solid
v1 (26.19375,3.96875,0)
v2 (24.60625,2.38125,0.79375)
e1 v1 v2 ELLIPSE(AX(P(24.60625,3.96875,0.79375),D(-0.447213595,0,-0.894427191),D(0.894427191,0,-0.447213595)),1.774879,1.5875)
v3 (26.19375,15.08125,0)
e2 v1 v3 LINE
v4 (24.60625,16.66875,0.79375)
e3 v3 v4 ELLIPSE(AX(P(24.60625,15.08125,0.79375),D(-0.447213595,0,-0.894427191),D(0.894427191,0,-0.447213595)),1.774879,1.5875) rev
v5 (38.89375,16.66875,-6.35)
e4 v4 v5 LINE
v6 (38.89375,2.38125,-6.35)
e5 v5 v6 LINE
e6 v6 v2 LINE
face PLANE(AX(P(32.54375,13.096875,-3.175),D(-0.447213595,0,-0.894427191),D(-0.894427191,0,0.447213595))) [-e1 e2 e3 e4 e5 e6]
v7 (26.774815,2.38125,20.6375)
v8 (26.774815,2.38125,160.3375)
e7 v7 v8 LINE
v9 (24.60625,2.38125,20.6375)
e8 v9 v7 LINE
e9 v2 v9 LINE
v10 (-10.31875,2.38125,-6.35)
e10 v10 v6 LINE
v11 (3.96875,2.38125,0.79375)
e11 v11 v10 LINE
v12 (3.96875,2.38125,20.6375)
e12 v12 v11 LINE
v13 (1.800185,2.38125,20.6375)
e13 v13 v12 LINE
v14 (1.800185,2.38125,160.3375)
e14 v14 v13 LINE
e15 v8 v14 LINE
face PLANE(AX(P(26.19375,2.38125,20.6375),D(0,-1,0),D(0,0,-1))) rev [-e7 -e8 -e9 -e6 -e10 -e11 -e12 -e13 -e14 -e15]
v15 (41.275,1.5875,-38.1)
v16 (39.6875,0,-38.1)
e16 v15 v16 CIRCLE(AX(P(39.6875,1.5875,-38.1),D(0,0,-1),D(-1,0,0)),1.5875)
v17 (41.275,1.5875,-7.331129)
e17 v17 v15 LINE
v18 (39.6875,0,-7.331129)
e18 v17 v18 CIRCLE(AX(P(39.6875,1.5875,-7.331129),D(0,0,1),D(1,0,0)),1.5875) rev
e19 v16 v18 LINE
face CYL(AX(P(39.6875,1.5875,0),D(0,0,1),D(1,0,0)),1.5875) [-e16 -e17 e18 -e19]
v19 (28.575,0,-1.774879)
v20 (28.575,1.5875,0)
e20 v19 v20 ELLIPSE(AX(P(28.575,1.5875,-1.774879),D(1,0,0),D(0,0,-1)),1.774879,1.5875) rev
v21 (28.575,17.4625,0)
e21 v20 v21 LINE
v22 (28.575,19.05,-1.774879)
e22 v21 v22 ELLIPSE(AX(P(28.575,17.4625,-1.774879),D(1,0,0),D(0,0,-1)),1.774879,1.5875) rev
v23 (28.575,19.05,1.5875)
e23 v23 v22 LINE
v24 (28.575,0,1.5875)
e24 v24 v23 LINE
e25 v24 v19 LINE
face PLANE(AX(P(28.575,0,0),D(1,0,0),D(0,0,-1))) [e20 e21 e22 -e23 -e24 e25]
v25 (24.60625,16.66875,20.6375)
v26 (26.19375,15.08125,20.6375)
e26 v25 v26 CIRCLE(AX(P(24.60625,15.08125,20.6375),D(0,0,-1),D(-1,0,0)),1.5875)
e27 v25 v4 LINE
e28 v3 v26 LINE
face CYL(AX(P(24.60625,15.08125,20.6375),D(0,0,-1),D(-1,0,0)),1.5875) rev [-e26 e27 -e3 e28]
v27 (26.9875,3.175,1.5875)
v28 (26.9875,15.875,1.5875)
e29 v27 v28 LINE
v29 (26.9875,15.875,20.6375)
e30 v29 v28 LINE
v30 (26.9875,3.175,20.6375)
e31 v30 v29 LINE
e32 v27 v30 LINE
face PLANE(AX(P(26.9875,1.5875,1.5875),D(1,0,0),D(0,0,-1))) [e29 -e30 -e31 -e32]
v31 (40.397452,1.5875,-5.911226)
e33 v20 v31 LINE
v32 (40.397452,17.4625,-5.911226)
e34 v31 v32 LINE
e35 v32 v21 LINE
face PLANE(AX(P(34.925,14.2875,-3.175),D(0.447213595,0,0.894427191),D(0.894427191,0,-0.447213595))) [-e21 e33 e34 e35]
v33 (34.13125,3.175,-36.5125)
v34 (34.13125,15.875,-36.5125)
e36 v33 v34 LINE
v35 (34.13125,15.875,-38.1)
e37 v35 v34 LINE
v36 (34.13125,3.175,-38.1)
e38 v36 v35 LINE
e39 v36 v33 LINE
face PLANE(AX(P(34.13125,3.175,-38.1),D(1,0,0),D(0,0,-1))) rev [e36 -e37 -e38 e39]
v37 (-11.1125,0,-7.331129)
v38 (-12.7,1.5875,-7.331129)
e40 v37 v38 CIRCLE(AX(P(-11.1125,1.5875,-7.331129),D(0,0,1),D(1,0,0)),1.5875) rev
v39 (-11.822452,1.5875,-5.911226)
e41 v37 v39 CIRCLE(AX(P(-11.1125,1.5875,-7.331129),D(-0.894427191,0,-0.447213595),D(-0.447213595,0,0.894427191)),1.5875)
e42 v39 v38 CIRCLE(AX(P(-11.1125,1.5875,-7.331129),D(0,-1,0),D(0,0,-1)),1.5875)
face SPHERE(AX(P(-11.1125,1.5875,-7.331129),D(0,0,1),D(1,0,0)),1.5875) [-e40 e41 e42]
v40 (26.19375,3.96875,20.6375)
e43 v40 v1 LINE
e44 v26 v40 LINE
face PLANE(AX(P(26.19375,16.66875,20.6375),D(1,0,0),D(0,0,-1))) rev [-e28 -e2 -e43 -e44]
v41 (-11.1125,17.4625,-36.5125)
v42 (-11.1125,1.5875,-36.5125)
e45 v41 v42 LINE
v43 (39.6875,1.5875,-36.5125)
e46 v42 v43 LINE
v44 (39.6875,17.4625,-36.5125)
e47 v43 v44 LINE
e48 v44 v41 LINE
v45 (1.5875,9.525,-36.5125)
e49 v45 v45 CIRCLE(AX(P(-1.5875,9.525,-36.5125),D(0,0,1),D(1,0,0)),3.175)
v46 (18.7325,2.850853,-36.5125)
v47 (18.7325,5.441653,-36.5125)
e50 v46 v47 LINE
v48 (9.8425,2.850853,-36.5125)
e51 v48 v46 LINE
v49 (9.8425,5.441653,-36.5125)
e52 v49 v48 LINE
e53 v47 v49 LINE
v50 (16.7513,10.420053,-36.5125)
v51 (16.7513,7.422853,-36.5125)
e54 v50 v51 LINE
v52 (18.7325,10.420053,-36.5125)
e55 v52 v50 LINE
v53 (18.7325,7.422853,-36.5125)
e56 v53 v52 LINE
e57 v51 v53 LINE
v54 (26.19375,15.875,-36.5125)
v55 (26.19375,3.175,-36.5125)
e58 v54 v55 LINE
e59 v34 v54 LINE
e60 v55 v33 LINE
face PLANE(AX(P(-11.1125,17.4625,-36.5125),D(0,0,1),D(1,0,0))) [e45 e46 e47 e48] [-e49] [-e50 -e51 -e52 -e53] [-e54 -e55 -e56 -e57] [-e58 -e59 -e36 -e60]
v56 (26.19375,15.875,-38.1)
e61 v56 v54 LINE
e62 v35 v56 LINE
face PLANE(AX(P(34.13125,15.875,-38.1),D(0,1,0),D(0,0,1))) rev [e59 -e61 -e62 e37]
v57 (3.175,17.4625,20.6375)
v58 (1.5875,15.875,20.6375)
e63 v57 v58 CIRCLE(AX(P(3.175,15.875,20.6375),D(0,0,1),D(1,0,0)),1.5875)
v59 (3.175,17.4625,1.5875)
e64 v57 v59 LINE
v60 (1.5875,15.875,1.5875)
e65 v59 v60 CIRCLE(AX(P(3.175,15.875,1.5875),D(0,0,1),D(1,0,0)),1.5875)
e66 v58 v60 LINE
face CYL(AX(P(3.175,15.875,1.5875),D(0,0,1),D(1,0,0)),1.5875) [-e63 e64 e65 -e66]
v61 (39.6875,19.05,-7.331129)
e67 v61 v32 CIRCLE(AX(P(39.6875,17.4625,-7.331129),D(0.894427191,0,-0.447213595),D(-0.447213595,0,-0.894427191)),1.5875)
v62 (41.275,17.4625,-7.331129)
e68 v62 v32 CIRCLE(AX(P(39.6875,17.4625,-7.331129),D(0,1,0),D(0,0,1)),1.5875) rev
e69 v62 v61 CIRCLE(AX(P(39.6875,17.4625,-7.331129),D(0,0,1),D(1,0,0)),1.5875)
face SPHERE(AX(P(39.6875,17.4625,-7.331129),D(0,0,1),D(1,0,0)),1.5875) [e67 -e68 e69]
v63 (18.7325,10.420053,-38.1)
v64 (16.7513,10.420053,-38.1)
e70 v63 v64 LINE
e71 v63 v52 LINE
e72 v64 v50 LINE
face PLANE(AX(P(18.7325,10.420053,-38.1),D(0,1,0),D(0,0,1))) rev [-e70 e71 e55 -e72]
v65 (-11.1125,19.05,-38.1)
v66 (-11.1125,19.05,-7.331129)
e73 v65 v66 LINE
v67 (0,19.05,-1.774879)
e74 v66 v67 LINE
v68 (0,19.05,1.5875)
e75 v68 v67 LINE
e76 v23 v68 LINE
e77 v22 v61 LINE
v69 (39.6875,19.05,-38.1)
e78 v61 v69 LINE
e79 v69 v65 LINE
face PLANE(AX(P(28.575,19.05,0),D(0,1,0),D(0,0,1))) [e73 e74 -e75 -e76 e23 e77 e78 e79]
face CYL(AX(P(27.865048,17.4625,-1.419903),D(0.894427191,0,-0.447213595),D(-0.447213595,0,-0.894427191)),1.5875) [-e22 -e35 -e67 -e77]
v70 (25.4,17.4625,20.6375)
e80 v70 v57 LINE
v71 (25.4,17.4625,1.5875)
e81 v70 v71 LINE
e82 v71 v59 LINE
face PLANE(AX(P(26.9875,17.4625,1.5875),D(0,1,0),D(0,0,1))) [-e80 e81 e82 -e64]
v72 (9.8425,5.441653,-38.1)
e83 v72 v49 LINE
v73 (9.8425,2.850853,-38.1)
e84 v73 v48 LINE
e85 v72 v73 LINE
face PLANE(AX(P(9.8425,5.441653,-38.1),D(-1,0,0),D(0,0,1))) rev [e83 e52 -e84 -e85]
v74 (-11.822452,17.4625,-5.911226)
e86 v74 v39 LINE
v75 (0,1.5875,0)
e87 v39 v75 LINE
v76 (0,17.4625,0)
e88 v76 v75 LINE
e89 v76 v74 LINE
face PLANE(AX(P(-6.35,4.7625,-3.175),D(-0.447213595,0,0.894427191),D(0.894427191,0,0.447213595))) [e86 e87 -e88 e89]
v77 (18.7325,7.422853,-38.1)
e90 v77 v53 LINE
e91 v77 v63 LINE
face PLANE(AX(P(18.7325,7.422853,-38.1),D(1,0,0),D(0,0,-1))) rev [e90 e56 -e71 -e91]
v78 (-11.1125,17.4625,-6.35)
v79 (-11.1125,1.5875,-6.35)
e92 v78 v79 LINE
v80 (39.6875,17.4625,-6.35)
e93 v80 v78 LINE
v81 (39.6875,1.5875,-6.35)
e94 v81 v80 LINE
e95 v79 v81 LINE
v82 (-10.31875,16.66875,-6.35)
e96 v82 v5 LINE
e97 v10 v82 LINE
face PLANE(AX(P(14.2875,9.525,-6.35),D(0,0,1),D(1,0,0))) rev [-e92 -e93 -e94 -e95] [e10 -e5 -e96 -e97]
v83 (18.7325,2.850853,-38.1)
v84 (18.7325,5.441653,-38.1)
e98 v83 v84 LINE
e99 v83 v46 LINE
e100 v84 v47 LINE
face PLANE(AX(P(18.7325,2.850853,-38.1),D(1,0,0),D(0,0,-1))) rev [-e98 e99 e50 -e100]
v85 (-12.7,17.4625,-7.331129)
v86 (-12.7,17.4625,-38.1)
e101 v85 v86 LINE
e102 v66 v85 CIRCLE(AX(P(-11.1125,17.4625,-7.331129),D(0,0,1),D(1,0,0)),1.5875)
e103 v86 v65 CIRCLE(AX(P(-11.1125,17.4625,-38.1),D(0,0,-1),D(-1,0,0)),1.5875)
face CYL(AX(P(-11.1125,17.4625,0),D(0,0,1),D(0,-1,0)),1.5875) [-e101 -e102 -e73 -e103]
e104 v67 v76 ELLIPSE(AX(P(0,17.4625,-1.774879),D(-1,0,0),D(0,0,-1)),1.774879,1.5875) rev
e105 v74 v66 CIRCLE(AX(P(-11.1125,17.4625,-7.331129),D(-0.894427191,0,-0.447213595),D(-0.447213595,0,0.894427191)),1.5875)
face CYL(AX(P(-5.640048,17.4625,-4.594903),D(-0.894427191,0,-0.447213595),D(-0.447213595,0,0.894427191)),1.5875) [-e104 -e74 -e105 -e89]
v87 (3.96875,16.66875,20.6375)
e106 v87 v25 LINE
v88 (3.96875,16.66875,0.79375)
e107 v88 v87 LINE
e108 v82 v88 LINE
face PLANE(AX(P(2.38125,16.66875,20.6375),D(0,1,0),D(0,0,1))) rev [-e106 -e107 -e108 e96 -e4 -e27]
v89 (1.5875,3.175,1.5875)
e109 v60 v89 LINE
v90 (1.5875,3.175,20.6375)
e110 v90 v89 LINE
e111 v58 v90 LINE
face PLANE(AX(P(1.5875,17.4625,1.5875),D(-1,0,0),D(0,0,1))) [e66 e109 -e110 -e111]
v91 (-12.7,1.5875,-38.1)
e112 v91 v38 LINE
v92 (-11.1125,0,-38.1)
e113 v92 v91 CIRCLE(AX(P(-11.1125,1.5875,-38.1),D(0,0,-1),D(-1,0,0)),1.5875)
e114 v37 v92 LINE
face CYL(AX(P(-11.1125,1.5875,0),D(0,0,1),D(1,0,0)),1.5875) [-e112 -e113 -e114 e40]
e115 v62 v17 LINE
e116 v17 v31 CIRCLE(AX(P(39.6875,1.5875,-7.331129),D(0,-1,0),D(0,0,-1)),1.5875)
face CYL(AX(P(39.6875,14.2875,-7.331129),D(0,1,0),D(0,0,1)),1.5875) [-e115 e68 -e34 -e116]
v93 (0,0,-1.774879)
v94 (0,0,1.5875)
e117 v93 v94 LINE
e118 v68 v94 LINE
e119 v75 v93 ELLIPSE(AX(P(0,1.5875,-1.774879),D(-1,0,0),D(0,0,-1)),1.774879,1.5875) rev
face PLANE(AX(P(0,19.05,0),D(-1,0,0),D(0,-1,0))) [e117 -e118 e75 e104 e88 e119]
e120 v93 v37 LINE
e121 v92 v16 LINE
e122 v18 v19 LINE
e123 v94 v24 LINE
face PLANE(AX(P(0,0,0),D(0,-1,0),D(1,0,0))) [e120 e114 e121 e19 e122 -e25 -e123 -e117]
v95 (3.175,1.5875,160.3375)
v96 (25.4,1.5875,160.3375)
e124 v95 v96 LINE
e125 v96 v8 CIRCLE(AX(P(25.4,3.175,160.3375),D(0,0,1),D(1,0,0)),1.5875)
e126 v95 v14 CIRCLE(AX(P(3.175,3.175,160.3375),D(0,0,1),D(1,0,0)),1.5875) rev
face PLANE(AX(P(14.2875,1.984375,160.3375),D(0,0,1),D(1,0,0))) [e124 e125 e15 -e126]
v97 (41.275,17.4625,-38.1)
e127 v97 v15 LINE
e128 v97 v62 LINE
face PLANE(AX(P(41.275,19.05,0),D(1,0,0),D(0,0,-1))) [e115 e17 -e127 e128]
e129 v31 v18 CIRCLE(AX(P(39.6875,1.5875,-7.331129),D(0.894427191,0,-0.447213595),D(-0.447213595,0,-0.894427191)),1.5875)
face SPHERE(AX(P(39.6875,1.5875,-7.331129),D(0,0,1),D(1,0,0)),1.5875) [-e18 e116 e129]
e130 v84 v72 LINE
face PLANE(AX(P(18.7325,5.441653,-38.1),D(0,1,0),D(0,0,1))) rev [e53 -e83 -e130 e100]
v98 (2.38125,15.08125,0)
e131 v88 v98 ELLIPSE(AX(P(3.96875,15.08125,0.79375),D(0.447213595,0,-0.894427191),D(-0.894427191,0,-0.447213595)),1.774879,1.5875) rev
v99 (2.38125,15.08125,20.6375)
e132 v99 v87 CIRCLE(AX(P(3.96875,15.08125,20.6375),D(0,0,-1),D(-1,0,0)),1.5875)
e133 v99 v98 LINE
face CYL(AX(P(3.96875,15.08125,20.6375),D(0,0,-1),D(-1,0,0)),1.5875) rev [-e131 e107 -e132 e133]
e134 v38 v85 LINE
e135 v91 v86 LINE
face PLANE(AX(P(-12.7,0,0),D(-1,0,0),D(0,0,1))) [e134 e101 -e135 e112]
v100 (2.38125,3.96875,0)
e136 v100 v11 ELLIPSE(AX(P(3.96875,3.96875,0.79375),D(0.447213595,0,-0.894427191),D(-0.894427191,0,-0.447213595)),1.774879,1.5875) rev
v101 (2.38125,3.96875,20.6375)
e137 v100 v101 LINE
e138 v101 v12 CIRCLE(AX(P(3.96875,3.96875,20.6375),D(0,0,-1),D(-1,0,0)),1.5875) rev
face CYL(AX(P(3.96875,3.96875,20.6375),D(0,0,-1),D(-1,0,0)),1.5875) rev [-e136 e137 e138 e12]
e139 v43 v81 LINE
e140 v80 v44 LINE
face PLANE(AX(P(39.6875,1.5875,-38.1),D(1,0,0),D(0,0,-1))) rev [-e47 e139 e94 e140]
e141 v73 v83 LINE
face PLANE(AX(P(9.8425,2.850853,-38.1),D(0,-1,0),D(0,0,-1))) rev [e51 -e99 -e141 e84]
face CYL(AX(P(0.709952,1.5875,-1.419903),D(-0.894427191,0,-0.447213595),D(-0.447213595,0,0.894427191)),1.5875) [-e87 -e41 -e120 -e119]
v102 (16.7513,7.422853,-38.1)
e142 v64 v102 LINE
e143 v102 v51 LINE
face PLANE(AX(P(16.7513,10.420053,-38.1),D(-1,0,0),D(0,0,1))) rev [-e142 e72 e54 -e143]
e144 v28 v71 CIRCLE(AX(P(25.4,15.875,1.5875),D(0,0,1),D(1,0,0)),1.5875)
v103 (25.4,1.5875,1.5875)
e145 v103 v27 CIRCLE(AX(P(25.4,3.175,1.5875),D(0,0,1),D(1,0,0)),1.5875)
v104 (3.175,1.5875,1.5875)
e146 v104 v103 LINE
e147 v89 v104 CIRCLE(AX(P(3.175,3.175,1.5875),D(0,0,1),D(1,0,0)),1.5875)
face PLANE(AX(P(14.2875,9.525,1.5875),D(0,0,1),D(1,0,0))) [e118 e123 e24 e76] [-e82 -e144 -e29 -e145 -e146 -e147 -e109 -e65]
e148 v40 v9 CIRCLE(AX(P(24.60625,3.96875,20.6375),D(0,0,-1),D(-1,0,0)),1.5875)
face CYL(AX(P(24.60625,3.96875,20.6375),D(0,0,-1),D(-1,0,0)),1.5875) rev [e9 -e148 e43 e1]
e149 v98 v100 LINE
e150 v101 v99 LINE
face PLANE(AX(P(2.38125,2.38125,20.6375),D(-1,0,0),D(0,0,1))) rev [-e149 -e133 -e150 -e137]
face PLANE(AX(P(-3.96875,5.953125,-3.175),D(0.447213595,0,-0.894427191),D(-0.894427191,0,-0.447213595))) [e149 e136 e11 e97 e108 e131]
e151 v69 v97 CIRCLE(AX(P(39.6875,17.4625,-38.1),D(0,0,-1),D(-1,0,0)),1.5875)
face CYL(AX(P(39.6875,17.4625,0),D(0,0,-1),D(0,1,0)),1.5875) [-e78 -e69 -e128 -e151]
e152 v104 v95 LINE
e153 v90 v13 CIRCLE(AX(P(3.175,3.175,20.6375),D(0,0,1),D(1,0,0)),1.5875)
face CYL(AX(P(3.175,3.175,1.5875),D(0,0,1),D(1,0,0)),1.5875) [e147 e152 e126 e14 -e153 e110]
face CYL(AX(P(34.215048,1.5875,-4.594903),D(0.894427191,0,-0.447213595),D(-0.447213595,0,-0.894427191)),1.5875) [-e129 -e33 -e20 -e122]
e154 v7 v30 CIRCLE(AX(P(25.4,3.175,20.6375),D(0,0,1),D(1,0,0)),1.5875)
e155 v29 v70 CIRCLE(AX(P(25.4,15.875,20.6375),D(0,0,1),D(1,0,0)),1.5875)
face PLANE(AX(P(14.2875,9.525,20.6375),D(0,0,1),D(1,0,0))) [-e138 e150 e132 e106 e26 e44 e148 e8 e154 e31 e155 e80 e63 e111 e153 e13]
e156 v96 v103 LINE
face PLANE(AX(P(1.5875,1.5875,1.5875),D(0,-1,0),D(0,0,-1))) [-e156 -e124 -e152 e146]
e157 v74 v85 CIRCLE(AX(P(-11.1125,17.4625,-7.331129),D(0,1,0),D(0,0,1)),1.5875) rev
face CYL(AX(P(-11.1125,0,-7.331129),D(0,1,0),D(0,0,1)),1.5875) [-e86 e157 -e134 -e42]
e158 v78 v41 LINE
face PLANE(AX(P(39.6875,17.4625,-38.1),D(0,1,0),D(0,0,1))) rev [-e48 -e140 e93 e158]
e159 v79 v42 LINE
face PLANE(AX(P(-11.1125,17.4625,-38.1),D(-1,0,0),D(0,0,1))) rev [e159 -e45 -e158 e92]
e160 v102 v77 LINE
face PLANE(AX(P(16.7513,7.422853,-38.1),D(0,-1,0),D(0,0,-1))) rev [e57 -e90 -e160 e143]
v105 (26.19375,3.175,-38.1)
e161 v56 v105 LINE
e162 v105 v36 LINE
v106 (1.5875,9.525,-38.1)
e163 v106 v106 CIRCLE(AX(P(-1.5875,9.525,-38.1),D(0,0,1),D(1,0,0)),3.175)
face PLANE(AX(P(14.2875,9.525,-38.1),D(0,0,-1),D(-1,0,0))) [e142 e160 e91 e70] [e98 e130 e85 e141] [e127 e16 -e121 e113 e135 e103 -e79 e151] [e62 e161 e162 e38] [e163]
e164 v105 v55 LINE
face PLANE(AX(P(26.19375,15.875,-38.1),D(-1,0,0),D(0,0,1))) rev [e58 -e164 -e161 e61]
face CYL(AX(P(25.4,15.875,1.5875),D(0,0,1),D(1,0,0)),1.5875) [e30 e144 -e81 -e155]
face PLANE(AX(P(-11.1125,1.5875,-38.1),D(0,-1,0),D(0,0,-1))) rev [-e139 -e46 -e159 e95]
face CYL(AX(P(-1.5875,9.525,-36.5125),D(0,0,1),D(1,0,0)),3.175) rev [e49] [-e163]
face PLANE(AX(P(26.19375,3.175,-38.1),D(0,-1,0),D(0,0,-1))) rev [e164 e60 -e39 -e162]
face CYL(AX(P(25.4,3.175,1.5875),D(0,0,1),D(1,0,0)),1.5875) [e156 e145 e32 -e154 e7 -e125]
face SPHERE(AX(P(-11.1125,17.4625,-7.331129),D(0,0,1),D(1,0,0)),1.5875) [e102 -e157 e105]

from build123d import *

# Parameters (mm, degrees)
CUT_EXTRUDE1_START         = -1.5875
CUT_EXTRUDE1_OUTLINE_W     = 53.975
CUT_EXTRUDE1_OUTLINE_H     = 19.05
CUT_EXTRUDE1_OUTLINE_W_2   = 50.8
CUT_EXTRUDE1_OUTLINE_H_2   = 15.875
CUT_EXTRUDE1_DEPTH         = 38.1
CUT_EXTRUDE1_START_2       = 30.1625
CUT_EXTRUDE1_2_DEPTH       = 166.6875
CUT_EXTRUDE1_3_DEPTH       = 6.35
CUT_EXTRUDE1_4_OUTLINE_W   = 50.8
CUT_EXTRUDE1_4_OUTLINE_H   = 15.875
CUT_EXTRUDE1_4_OUTLINE_W_2 = 7.9375
CUT_EXTRUDE1_4_OUTLINE_H_2 = 12.7
CUT_EXTRUDE1_4_DEPTH       = 1.5875
CUT_EXTRUDE1_5_DEPTH       = 26.9875
CUT_EXTRUDE1_6_OUTLINE_W   = 28.575
CUT_EXTRUDE1_6_OUTLINE_H   = 19.05
CUT_EXTRUDE1_6_DEPTH       = 7.9375
CUT_EXTRUDE1_START_3       = 2.38125
CUT_EXTRUDE1_7_DEPTH       = 14.2875
CUT_EXTRUDE1_8_DEPTH       = 19.05
SKETCH2_W                  = 8.89
SKETCH2_H                  = 2.5908
CUT_EXTRUDE2_DEPTH         = 203.030816028
SKETCH3_W                  = 1.9812
SKETCH3_H                  = 2.9972
CUT_EXTRUDE3_DEPTH         = 203.030816028
FILLET1_R                  = 1.5875
HOLE1_D                    = 6.35
HOLE1_DEPTH                = 1.5875


with BuildPart() as part:
    # Cut-Extrude1: read off the stored shape, not the designer's step
    # Cut-Extrude1 outline → Cut-Extrude1 (new body)
    with BuildSketch(Plane.XY.offset(-36.5125).offset(CUT_EXTRUDE1_START)):
        with Locations((14.2875, 9.525)):
            Rectangle(CUT_EXTRUDE1_OUTLINE_W, CUT_EXTRUDE1_OUTLINE_H)
        with Locations((14.2875, 9.525)):
            Rectangle(CUT_EXTRUDE1_OUTLINE_W_2, CUT_EXTRUDE1_OUTLINE_H_2, mode=Mode.SUBTRACT)
    extrude(amount=CUT_EXTRUDE1_DEPTH)

    # Cut-Extrude1 2 outline → Cut-Extrude1 2 (add)
    with BuildSketch(Plane.XY.offset(-36.5125).offset(CUT_EXTRUDE1_START_2)):
        with BuildLine():
            Line((3.175, 1.5875), (25.4, 1.5875))
            ThreePointArc((25.4, 1.5875), (26.19375, 1.800184672), (26.774815328, 2.38125))
            Line((26.774815328, 2.38125), (1.800184672, 2.38125))
            ThreePointArc((1.800184672, 2.38125), (2.38125, 1.800184672), (3.175, 1.5875))
        make_face()
    extrude(amount=CUT_EXTRUDE1_2_DEPTH)

    # Cut-Extrude1 3 outline → Cut-Extrude1 3 (add)
    with BuildSketch(Plane.XY.offset(-36.5125).offset(CUT_EXTRUDE1_START_2)):
        with BuildLine():
            Line((25.4, 1.5875), (39.6875, 1.5875))
            Line((39.6875, 1.5875), (39.6875, 17.4625))
            Line((39.6875, 17.4625), (-11.1125, 17.4625))
            Line((-11.1125, 17.4625), (-11.1125, 1.5875))
            Line((-11.1125, 1.5875), (3.175, 1.5875))
            ThreePointArc((3.175, 1.5875), (2.38125, 1.800184672), (1.800184672, 2.38125))
            Line((1.800184672, 2.38125), (3.96875, 2.38125))
            ThreePointArc((3.96875, 2.38125), (2.846217985, 2.846217985), (2.38125, 3.96875))
            Line((2.38125, 3.96875), (2.38125, 15.08125))
            ThreePointArc((2.38125, 15.08125), (2.846217985, 16.203782015), (3.96875, 16.66875))
            Line((3.96875, 16.66875), (24.60625, 16.66875))
            ThreePointArc((24.60625, 16.66875), (25.728782015, 16.203782015), (26.19375, 15.08125))
            Line((26.19375, 15.08125), (26.19375, 3.96875))
            ThreePointArc((26.19375, 3.96875), (25.728782015, 2.846217985), (24.60625, 2.38125))
            Line((24.60625, 2.38125), (26.774815328, 2.38125))
            ThreePointArc((26.774815328, 2.38125), (26.19375, 1.800184672), (25.4, 1.5875))
        make_face()
    extrude(amount=CUT_EXTRUDE1_3_DEPTH)

    # Cut-Extrude1 4 outline → Cut-Extrude1 4 (add)
    with BuildSketch(Plane.XY.offset(-36.5125).offset(CUT_EXTRUDE1_START)):
        with Locations((14.2875, 9.525)):
            Rectangle(CUT_EXTRUDE1_4_OUTLINE_W, CUT_EXTRUDE1_4_OUTLINE_H)
        with Locations((30.1625, 9.525)):
            Rectangle(CUT_EXTRUDE1_4_OUTLINE_W_2, CUT_EXTRUDE1_4_OUTLINE_H_2, mode=Mode.SUBTRACT)
    extrude(amount=CUT_EXTRUDE1_4_DEPTH)

    # Cut-Extrude1 5 outline → Cut-Extrude1 5 (add)
    with BuildSketch(Plane.XY.offset(-36.5125).offset(CUT_EXTRUDE1_START_2)):
        with BuildLine():
            Line((25.4, 17.4625), (3.175, 17.4625))
            ThreePointArc((3.175, 17.4625), (2.052467985, 16.997532015), (1.5875, 15.875))
            Line((1.5875, 15.875), (1.5875, 3.175))
            ThreePointArc((1.5875, 3.175), (1.641592751, 2.764124766), (1.800184672, 2.38125))
            Line((1.800184672, 2.38125), (3.96875, 2.38125))
            ThreePointArc((3.96875, 2.38125), (2.846217985, 2.846217985), (2.38125, 3.96875))
            Line((2.38125, 3.96875), (2.38125, 15.08125))
            ThreePointArc((2.38125, 15.08125), (2.846217985, 16.203782015), (3.96875, 16.66875))
            Line((3.96875, 16.66875), (24.60625, 16.66875))
            ThreePointArc((24.60625, 16.66875), (25.728782015, 16.203782015), (26.19375, 15.08125))
            Line((26.19375, 15.08125), (26.19375, 3.96875))
            ThreePointArc((26.19375, 3.96875), (25.728782015, 2.846217985), (24.60625, 2.38125))
            Line((24.60625, 2.38125), (26.774815328, 2.38125))
            ThreePointArc((26.774815328, 2.38125), (26.933407249, 2.764124766), (26.9875, 3.175))
            Line((26.9875, 3.175), (26.9875, 15.875))
            ThreePointArc((26.9875, 15.875), (26.522532015, 16.997532015), (25.4, 17.4625))
        make_face()
    extrude(amount=CUT_EXTRUDE1_5_DEPTH)

    # Cut-Extrude1 6 outline → Cut-Extrude1 6 (add)
    with BuildSketch(Plane.XY.offset(-36.5125).offset(CUT_EXTRUDE1_START_2)):
        with Locations((14.2875, 9.525)):
            Rectangle(CUT_EXTRUDE1_6_OUTLINE_W, CUT_EXTRUDE1_6_OUTLINE_H)
        with BuildLine():
            Line((25.4, 1.5875), (3.175, 1.5875))
            ThreePointArc((3.175, 1.5875), (2.052467985, 2.052467985), (1.5875, 3.175))
            Line((1.5875, 3.175), (1.5875, 15.875))
            ThreePointArc((1.5875, 15.875), (2.052467985, 16.997532015), (3.175, 17.4625))
            Line((3.175, 17.4625), (25.4, 17.4625))
            ThreePointArc((25.4, 17.4625), (26.522532015, 16.997532015), (26.9875, 15.875))
            Line((26.9875, 15.875), (26.9875, 3.175))
            ThreePointArc((26.9875, 3.175), (26.522532015, 2.052467985), (25.4, 1.5875))
        make_face(mode=Mode.SUBTRACT)
    extrude(amount=CUT_EXTRUDE1_6_DEPTH)

    # Cut-Extrude1 7 outline → Cut-Extrude1 7 (cut)
    with BuildSketch(Plane(origin=(0, 0, 0), x_dir=(1, 0, 0), z_dir=(0, 1, 0)).offset(CUT_EXTRUDE1_START_3)):
        Polygon((41.275, 6.35), (28.575, 0), (41.275, 0), align=None)
        Polygon((38.89375, 6.35), (-10.31875, 6.35), (6.38125, -2), (22.19375, -2), align=None)
        Polygon((0, 0), (-12.7, 6.35), (-12.7, 0), align=None)
    extrude(amount=CUT_EXTRUDE1_7_DEPTH, mode=Mode.SUBTRACT)

    # Cut-Extrude1 8 outline → Cut-Extrude1 8 (cut)
    with BuildSketch(Plane(origin=(0, 0, 0), x_dir=(1, 0, 0), z_dir=(0, 1, 0))):
        Polygon((41.275, 6.35), (28.575, 0), (41.275, 0), align=None)
        Polygon((0, 0), (-12.7, 6.35), (-12.7, 0), align=None)
    extrude(amount=CUT_EXTRUDE1_8_DEPTH, mode=Mode.SUBTRACT)

    # Sketch2 → Cut-Extrude2 (cut, through all)
    with BuildSketch(Plane.XY.offset(-36.5125)):
        with Locations((14.2875, 4.146252538)):
            Rectangle(SKETCH2_W, SKETCH2_H)
    extrude(amount=-CUT_EXTRUDE2_DEPTH, mode=Mode.SUBTRACT)

    # Sketch3 → Cut-Extrude3 (cut, through all)
    with BuildSketch(Plane.XY.offset(-36.5125)):
        with Locations((17.7419, 8.921452538)):
            Rectangle(SKETCH3_W, SKETCH3_H)
    extrude(amount=-CUT_EXTRUDE3_DEPTH, mode=Mode.SUBTRACT)

    # Fillet1
    fillet1_edges = [part.edges().sort_by_distance(p)[0] for p in [
        (-6.35, 0, -3.175),
        (-12.7, 0, -22.225),
        (-6.35, 19.05, -3.175),
        (-12.7, 9.525, -6.35),
        (-12.7, 19.05, -22.225),
        (41.275, 0, -22.225),
        (34.925, 0, -3.175),
        (41.275, 9.525, -6.35),
        (34.925, 19.05, -3.175),
        (41.275, 19.05, -22.225),
    ]]
    fillet(fillet1_edges, radius=FILLET1_R)

    # Hole1
    with Locations(Plane.XY.offset(-36.5125)):
        with Locations((-1.5875, 9.525)):
            Hole(HOLE1_D / 2, depth=HOLE1_DEPTH)


solid = part.part
